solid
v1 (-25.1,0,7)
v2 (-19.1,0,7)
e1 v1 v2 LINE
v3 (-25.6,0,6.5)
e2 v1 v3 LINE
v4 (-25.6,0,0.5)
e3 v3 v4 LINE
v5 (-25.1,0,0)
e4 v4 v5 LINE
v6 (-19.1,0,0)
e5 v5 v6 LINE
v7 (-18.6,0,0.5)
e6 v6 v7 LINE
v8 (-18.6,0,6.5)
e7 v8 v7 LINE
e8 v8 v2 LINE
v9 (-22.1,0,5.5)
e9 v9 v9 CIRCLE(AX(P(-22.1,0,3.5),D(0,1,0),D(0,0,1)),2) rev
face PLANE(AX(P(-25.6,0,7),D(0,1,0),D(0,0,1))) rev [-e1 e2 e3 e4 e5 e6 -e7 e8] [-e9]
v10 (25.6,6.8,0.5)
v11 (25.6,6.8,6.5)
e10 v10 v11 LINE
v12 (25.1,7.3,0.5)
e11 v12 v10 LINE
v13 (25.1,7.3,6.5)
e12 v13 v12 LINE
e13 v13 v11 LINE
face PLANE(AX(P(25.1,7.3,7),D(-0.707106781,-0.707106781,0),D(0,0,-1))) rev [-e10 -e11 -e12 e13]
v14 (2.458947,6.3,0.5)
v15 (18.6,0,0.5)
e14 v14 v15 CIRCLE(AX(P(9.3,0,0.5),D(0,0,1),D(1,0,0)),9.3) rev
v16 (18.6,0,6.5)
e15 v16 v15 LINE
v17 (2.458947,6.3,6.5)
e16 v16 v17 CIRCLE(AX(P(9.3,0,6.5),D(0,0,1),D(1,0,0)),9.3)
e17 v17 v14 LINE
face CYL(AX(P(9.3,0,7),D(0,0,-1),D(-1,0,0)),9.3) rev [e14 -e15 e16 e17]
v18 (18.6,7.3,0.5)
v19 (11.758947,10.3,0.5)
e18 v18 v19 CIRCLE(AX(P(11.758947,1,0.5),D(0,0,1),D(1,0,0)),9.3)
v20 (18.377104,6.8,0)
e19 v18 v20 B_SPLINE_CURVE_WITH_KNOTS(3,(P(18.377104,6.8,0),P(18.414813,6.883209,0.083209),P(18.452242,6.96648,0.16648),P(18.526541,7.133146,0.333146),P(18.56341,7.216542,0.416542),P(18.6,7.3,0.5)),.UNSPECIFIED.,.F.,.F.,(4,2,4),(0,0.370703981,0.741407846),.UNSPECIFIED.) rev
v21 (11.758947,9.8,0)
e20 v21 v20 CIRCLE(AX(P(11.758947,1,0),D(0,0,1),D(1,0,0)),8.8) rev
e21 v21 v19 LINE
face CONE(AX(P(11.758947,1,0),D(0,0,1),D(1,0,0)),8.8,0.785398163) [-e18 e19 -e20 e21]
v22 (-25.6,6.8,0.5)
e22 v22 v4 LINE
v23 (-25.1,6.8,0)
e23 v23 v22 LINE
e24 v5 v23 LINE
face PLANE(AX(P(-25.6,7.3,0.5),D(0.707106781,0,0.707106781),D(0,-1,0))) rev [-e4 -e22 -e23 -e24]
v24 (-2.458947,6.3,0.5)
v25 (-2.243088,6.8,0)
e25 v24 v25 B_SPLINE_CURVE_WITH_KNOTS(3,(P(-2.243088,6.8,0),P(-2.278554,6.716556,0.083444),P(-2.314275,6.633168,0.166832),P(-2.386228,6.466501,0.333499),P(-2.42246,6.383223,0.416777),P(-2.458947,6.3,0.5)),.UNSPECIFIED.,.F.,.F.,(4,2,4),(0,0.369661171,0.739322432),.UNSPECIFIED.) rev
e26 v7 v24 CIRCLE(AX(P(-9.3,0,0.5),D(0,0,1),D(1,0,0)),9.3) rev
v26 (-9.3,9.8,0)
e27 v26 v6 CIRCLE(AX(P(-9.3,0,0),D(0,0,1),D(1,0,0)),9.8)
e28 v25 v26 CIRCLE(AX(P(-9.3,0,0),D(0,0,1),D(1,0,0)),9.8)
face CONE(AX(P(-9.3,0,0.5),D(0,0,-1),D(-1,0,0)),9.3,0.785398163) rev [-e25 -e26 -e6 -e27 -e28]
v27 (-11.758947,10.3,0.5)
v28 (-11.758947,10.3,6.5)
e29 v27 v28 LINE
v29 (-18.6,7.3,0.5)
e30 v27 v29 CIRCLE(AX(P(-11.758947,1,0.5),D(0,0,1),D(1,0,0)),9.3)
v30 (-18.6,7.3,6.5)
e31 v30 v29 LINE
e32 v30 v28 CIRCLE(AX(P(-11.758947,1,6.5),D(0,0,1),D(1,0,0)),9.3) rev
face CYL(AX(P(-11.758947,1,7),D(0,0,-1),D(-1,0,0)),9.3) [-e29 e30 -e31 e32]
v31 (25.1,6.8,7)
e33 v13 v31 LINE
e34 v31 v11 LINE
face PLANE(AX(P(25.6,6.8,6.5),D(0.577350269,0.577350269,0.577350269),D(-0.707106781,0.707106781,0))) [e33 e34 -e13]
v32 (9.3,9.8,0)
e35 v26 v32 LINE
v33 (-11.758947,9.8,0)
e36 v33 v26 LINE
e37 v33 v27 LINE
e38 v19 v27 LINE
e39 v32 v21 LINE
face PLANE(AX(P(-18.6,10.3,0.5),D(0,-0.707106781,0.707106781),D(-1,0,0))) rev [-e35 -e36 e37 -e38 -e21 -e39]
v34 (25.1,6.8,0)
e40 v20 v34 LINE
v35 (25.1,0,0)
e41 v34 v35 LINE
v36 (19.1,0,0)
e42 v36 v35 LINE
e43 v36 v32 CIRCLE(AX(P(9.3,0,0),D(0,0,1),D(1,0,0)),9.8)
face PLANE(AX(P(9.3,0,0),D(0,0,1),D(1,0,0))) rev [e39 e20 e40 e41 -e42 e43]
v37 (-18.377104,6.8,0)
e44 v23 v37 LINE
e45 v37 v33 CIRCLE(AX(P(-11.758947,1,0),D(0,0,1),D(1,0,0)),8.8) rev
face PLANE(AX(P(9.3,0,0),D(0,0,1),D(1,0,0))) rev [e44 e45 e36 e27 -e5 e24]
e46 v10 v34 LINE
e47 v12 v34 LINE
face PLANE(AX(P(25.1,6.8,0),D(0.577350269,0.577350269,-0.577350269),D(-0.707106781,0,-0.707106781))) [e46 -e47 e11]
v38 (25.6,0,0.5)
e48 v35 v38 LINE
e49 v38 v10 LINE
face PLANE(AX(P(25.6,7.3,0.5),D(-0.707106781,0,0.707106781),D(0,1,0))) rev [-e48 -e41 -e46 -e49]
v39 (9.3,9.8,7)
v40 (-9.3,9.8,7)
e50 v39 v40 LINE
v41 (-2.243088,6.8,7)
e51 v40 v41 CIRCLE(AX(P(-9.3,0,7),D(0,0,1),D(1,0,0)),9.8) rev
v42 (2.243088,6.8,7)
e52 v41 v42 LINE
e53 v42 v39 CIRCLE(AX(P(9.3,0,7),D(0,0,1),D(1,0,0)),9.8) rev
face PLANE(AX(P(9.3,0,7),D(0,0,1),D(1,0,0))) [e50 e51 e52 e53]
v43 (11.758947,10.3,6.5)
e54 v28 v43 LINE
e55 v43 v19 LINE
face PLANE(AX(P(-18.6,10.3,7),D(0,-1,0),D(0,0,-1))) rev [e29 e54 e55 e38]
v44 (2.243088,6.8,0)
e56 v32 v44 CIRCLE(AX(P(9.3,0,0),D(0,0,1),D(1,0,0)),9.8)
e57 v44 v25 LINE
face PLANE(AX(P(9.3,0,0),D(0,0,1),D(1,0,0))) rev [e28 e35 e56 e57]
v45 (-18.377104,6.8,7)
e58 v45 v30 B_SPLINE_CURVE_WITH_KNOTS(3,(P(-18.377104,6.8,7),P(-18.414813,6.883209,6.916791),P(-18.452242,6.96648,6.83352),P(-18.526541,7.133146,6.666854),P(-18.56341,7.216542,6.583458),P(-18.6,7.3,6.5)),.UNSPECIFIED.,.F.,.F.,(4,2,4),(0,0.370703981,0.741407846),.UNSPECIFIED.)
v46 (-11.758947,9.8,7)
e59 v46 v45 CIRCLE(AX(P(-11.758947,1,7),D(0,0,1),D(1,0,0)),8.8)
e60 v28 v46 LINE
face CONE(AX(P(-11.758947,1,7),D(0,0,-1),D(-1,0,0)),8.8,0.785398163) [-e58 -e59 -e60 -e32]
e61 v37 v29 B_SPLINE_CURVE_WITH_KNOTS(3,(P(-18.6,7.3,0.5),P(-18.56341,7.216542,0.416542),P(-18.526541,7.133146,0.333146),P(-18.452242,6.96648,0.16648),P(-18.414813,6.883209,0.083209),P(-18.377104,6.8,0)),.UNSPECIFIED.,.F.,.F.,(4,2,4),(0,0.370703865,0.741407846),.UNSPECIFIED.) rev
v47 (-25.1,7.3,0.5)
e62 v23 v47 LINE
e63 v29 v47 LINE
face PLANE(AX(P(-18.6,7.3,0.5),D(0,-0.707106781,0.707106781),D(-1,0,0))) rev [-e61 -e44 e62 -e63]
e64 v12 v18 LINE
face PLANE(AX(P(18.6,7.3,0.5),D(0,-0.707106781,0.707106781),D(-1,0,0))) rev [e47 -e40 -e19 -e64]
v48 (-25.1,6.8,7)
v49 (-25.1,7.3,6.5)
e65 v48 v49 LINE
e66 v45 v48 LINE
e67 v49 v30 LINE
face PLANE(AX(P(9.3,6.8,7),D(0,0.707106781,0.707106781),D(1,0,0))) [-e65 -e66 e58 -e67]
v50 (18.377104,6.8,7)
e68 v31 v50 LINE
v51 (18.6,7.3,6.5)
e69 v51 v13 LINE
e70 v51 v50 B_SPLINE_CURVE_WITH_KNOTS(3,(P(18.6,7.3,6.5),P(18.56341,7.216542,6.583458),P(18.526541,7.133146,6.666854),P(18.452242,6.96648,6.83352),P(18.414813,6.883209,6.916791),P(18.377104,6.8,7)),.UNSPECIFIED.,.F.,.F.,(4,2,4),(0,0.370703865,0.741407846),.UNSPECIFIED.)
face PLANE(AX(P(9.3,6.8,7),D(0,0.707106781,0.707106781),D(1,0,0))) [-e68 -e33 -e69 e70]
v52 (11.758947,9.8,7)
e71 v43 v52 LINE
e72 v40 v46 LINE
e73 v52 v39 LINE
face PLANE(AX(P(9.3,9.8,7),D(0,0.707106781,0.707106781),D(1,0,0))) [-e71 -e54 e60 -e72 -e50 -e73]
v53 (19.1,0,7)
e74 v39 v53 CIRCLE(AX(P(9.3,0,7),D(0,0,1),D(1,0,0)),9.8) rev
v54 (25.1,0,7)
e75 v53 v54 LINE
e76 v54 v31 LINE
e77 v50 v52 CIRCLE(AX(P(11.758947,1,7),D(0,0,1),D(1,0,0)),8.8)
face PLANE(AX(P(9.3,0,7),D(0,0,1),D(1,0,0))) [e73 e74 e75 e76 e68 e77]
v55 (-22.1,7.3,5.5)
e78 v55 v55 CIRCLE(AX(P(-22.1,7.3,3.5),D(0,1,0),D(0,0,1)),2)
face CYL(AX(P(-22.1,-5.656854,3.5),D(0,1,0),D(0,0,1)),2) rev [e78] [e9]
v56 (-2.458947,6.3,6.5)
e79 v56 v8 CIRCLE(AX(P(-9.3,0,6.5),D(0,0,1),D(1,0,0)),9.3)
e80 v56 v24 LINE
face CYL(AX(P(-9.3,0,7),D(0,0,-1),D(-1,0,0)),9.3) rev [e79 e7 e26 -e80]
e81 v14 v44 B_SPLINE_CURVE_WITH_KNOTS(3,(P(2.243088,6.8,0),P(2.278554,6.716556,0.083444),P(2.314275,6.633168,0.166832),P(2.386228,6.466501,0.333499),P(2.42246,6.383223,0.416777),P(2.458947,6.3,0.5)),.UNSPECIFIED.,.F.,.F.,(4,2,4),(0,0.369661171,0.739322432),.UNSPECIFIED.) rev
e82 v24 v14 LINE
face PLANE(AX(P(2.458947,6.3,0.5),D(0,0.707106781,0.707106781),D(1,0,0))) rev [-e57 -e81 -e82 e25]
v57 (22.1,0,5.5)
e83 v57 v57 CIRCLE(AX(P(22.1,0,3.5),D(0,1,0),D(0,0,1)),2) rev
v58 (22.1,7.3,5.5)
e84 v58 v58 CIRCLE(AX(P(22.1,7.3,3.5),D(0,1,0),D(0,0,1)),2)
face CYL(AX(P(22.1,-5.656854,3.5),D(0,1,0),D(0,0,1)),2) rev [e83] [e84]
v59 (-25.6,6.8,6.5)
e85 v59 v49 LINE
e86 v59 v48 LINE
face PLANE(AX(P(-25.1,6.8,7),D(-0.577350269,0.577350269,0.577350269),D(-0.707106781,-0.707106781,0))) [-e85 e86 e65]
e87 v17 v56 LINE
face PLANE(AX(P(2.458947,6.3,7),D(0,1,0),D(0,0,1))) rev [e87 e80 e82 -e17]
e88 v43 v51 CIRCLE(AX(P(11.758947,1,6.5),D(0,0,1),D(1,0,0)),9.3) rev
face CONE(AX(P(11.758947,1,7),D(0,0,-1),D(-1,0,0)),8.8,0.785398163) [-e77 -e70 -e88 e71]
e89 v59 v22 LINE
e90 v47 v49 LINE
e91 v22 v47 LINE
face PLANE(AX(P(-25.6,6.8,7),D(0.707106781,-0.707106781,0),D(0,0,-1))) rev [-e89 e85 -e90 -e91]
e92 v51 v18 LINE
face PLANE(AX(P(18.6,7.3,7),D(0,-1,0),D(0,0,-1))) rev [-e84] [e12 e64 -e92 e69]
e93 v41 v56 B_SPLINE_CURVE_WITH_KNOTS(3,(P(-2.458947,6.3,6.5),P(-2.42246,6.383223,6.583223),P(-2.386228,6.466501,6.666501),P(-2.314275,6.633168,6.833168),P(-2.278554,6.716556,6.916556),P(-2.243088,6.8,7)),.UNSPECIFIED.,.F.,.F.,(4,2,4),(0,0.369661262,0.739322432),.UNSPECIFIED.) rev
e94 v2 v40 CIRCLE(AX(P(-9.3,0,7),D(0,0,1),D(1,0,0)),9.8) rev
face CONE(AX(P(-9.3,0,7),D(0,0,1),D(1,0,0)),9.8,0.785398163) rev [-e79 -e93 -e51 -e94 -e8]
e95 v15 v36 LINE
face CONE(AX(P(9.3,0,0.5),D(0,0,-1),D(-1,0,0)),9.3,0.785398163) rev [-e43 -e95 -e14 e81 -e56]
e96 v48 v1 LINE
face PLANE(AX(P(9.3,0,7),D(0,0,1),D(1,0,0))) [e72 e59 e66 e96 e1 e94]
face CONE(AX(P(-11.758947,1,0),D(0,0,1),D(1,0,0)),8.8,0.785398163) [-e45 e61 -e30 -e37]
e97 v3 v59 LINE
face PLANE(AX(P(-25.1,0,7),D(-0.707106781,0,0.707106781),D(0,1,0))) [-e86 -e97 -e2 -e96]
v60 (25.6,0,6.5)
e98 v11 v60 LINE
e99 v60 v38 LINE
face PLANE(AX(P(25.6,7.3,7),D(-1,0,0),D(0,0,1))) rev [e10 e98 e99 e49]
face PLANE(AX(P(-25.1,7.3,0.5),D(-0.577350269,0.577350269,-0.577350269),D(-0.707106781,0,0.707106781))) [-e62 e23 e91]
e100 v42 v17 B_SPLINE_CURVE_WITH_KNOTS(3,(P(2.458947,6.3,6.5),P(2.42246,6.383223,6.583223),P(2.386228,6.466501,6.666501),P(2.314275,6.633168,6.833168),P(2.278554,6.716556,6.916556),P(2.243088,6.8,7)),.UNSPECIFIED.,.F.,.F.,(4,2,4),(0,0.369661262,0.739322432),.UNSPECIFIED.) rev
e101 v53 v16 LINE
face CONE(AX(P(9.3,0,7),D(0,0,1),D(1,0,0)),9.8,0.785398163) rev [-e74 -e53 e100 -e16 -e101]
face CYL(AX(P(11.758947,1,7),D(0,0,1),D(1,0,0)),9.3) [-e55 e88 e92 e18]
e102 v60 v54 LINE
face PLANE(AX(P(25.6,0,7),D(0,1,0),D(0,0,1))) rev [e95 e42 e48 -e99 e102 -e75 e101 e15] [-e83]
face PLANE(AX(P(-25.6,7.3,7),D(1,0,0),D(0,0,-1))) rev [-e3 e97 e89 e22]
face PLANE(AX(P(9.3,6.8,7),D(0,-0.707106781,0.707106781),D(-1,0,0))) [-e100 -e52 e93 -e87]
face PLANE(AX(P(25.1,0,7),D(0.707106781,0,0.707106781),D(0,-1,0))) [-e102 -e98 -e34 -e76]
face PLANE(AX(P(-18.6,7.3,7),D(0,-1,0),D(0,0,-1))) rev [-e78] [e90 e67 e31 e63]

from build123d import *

# Parameters (mm, degrees)
SALIENTE_EXTRUIR1_DEPTH = 7
CROQUIS2_R              = 2
CORTAR_EXTRUIR1_DEPTH   = 7.3
REDONDEO1_R             = 9.3
CHAFL_N1_SIZE           = 0.5


# Some blends are built 0.0001 mm under size
with BuildPart() as part:
    # Croquis1 → Saliente-Extruir1 (new body)
    with BuildSketch(Plane.XY):
        with BuildLine():
            Line((2.458947449, 6.3), (-2.458947449, 6.3))
            ThreePointArc((-2.458947449, 6.3), (-12.681435441, 8.663480499), (-18.6, 0))
            Line((-18.6, 0), (-25.6, 0))
            Line((-25.6, 0), (-25.6, 7.3))
            Line((-25.6, 7.3), (-18.6, 7.3))
            Line((-18.6, 7.3), (-18.6, 10.3))
            Line((-18.6, 10.3), (18.6, 10.3))
            Line((18.6, 10.3), (18.6, 7.3))
            Line((18.6, 7.3), (25.6, 7.3))
            Line((25.6, 7.3), (25.6, 0))
            Line((25.6, 0), (18.6, 0))
            ThreePointArc((18.6, 0), (12.681435441, 8.663480499), (2.458947449, 6.3))
        make_face()
    extrude(amount=SALIENTE_EXTRUIR1_DEPTH)

    # Croquis2 → Cortar-Extruir1 (cut)
    with BuildSketch(Plane(origin=(0, 7.3, 0), x_dir=(1, 0, 0), z_dir=(0, 1, 0))):
        with Locations(Location((22.1, -3.5, 0), (0, 0, 270))):
            Circle(CROQUIS2_R)
        with Locations(Location((-22.1, -3.5, 0), (0, 0, 270))):
            Circle(CROQUIS2_R)
    extrude(amount=-CORTAR_EXTRUIR1_DEPTH, mode=Mode.SUBTRACT)

    # Redondeo1
    # the kernel refuses this fillet: 9.3 mm, written as the material it takes off along each edge
    with BuildSketch(Plane(origin=(-18.6, 10.3, -17.102631376), x_dir=(0, -1, 0), z_dir=(0, 0, 1))) as redondeo1_piece_1:
        with BuildLine():
            CenterArc((9.3, 6.841052551), REDONDEO1_R, 180, 47.35769002)
            Line((0, 6.841052551), (-0.186, 6.841052551))
            Line((-0.186, 6.841052551), (-0.186, 0))
            Line((-0.186, 0), (0, -0.186))
            ThreePointArc((0, -0.186), (1.5, -0.186), (2.874, -0.136821051))
            Line((2.874, -0.136821051), (3, 0))
        make_face()
    extrude(amount=41.205262753, mode=Mode.SUBTRACT)
    with BuildSketch(Plane(origin=(18.6, 10.3, -17.102631376), x_dir=(-1, 0, 0), z_dir=(0, 0, 1))) as redondeo1_piece_2:
        with BuildLine():
            CenterArc((6.841052551, 9.3), REDONDEO1_R, 222.64230998, 47.35769002)
            Line((0, 3), (-0.136821051, 2.874))
            ThreePointArc((-0.136821051, 2.874), (-0.186, 1.5), (-0.186, 0))
            Line((-0.186, 0), (0, -0.186))
            Line((0, -0.186), (6.841052551, -0.186))
            Line((6.841052551, -0.186), (6.841052551, 0))
        make_face()
    extrude(amount=41.205262753, mode=Mode.SUBTRACT)

    # Chaflán1
    chafl_n1_edges = [part.edges().sort_by_distance(p)[0] for p in [
        (12.681435441, 8.663480499, 0),
        (0, 6.3, 0),
        (-12.681435441, 8.663480499, 0),
        (-25.6, 3.65, 0),
        (-22.1, 7.3, 0),
        (22.1, 7.3, 0),
        (25.6, 3.65, 0),
        (-22.1, 7.3, 7),
        (-25.6, 7.3, 3.5),
        (25.6, 7.3, 3.5),
        (-25.6, 3.65, 7),
        (-12.681435441, 8.663480499, 7),
        (0, 6.3, 7),
        (12.681435441, 8.663480499, 7),
        (25.6, 3.65, 7),
        (0, 10.3, 0),
        (15.493917329, 9.51704174, 0),
        (-15.493917329, 9.51704174, 0),
        (0, 10.3, 7),
        (15.493917329, 9.51704174, 7),
        (-15.493917329, 9.51704174, 7),
        (22.1, 7.3, 7),
    ]]
    chamfer(chafl_n1_edges, length=CHAFL_N1_SIZE - 0.0001)  # a hair under: the kernel refuses the full size


solid = part.part
